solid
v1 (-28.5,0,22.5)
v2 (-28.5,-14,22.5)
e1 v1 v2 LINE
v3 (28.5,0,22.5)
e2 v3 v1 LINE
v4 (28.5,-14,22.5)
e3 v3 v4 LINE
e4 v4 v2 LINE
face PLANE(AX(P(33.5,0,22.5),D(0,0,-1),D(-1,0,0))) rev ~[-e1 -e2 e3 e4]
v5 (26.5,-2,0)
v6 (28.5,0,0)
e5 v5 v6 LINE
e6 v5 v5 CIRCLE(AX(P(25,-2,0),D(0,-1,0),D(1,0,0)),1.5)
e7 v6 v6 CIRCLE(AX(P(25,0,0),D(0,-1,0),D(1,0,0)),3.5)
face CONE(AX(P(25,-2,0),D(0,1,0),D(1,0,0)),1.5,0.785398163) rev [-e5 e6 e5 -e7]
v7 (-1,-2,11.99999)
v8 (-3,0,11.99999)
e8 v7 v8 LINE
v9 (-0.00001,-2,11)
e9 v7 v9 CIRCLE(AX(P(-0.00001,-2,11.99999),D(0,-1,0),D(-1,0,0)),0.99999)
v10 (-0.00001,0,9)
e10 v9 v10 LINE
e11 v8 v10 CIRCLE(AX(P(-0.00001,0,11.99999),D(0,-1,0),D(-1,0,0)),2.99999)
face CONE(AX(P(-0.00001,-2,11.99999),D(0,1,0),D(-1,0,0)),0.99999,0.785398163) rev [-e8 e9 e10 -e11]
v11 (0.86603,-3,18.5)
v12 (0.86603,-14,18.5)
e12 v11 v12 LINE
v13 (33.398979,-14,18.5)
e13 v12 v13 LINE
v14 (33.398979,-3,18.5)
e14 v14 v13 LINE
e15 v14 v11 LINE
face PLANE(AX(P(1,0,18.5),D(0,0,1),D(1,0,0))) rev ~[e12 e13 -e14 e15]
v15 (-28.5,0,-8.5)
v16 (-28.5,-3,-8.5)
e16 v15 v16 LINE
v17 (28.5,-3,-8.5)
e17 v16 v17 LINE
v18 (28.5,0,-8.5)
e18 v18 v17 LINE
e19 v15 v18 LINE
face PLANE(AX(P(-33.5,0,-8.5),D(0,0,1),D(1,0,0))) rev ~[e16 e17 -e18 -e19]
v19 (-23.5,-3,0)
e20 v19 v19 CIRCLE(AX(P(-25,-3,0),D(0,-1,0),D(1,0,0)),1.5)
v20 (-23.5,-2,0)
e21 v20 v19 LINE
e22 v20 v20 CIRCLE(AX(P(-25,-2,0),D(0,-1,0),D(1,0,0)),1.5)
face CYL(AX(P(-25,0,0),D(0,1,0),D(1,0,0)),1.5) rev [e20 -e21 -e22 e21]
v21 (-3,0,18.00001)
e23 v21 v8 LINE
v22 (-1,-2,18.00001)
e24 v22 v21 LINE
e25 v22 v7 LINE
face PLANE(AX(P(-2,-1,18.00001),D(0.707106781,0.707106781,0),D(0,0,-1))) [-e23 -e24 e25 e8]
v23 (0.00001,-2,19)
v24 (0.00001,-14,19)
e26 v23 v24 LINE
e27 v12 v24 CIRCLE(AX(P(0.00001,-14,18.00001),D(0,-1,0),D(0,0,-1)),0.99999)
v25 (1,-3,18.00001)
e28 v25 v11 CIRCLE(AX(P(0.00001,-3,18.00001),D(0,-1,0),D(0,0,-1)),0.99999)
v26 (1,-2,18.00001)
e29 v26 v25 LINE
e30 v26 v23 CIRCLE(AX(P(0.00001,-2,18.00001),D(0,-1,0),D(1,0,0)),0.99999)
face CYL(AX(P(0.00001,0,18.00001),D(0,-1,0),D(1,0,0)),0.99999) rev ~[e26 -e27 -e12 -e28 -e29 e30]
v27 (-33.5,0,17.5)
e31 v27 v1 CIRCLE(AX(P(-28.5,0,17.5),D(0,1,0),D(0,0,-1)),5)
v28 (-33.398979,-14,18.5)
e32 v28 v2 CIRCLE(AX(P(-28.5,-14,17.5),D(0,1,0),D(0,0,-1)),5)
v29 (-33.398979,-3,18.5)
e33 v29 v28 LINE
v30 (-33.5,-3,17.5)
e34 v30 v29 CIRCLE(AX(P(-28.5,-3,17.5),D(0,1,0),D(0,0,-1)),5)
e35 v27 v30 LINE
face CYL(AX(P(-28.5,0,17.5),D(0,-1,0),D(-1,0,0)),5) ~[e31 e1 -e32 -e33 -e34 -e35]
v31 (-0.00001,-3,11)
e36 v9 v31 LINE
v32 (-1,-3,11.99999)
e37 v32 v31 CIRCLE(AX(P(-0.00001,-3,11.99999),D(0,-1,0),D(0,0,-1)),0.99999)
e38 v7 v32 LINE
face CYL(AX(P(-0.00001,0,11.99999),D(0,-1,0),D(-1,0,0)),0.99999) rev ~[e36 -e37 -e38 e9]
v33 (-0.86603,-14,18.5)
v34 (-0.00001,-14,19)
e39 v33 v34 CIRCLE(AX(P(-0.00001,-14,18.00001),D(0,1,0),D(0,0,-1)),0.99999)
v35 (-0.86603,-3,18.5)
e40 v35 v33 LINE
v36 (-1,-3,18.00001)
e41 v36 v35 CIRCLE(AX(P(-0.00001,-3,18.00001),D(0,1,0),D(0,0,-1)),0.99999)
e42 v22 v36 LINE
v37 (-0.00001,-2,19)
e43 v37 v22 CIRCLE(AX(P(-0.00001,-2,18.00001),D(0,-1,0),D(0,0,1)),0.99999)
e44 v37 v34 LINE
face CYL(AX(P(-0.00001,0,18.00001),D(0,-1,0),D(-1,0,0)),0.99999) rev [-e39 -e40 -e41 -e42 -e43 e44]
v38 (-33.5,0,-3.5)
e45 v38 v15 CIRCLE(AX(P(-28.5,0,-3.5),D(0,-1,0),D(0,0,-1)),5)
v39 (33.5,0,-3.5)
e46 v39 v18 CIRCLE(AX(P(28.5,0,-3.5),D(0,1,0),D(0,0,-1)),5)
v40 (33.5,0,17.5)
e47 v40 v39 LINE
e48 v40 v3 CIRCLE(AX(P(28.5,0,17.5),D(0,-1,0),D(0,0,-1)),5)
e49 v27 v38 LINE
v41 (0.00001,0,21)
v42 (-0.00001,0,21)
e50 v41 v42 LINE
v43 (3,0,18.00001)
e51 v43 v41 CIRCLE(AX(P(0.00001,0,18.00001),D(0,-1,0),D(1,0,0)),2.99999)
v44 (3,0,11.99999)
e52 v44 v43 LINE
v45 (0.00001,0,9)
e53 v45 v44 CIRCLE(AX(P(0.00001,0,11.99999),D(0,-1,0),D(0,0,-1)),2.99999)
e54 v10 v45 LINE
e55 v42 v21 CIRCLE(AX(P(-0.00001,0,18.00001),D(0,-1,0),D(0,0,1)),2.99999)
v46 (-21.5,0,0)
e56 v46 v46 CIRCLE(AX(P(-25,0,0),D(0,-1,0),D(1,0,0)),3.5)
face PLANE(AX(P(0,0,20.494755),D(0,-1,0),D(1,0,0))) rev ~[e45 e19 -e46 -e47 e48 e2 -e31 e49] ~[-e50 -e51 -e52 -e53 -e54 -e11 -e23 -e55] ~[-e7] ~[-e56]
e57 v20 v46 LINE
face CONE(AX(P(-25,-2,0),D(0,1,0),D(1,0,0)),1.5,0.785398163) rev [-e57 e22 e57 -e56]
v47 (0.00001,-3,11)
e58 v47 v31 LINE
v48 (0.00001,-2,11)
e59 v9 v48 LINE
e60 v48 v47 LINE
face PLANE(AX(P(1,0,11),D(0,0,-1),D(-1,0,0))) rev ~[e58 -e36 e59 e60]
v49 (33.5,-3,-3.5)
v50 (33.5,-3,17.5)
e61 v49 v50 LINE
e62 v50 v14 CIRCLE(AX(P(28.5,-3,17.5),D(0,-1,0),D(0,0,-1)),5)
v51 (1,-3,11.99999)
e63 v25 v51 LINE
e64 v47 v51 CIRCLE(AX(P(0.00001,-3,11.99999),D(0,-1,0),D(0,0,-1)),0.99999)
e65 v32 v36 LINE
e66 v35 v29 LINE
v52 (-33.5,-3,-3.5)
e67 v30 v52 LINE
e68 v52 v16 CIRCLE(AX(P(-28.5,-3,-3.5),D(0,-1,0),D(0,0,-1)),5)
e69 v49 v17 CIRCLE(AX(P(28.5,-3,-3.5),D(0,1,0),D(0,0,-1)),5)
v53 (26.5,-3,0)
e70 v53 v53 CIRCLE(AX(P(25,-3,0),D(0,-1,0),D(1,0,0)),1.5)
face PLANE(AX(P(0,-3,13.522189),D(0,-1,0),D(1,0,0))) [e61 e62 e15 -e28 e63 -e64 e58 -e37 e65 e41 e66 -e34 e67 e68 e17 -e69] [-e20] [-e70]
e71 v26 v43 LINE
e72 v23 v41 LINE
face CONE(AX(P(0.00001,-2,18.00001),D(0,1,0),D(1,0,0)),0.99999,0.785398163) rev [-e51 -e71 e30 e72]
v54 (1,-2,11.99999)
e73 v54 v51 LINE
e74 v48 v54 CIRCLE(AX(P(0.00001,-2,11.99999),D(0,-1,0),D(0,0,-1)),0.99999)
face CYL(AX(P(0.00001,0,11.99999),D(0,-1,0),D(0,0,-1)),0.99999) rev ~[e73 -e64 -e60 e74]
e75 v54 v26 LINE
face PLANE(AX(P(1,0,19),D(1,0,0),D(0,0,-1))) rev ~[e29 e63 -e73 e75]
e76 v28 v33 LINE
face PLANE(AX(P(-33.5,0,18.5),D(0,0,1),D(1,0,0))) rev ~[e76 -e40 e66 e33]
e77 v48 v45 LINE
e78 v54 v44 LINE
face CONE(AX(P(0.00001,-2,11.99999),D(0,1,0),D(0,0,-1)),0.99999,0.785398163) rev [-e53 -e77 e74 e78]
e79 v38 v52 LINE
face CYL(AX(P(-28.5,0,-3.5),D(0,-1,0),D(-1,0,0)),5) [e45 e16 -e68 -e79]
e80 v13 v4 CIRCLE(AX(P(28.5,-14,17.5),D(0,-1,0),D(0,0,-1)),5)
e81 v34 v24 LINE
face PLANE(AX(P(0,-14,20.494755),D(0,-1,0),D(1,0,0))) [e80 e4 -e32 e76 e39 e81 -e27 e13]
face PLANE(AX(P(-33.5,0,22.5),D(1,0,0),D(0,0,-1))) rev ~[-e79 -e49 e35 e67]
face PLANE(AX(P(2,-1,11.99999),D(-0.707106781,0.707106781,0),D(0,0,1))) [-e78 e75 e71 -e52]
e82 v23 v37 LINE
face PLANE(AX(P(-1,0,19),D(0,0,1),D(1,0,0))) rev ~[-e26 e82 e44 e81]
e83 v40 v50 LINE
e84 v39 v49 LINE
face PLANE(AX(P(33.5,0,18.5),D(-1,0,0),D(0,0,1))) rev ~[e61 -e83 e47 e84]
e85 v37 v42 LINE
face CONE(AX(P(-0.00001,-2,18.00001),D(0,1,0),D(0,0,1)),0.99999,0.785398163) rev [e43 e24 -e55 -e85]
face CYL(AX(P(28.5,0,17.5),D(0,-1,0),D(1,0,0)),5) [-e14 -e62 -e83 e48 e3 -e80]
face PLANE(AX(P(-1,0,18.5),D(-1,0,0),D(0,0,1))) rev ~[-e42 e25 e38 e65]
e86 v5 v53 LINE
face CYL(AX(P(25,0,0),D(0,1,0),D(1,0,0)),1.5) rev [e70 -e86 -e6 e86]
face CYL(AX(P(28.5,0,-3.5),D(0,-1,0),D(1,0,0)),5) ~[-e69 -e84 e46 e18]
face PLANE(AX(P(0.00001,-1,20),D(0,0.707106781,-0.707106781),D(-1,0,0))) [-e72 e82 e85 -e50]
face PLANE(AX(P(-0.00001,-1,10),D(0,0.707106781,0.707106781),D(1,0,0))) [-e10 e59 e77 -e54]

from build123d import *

# Parameters (mm, degrees)
F0_W     = 67
F0_H     = 17
F0_R     = 1.5
F1_DEPTH = 3
F2_DEPTH = 14
F3_R     = 5
F4_R     = 0.99999
F5_SIZE  = 2


# Not quite as in the source:
# - a fillet or chamfer is up to 0.001 mm smaller than in the source, because OpenCascade refuses the exact size


with BuildPart() as f1:
    # F0 (on Front) → F1 (new body)
    with BuildSketch(Plane.XZ):
        Polygon((-33.5, 18.5), (-33.5, 8.5), (33.5, 8.5), (33.5, 18.5), (1, 18.5), (1, 11), (-1, 11), (-1, 18.5), align=None)
        Rectangle(F0_W, F0_H)
        with Locations((-25, 0)):
            Circle(F0_R, mode=Mode.SUBTRACT)
        with Locations((25, 0)):
            Circle(F0_R, mode=Mode.SUBTRACT)
    extrude(amount=F1_DEPTH)

    # F0 (on Front) → F2 (join)
    with BuildSketch(Plane.XZ):
        Polygon((-33.5, 22.5), (-33.5, 18.5), (-1, 18.5), (-1, 19), (1, 19), (1, 18.5), (33.5, 18.5), (33.5, 22.5), align=None)
    extrude(amount=F2_DEPTH)

    # F3
    f3_edges = [f1.edges().sort_by_distance(p)[0] for p in [
        (-33.5, -1.5, -8.5),
        (33.5, -1.5, -8.5),
        (-33.5, -7, 22.5),
        (33.5, -7, 22.5),
    ]]
    fillet(f3_edges, radius=F3_R)

    # F4 (radius 1 in the source; OpenCascade refuses exactly that, so slightly less here)
    f4_edges = [f1.edges().sort_by_distance(p)[0] for p in [
        (-1, -7, 19),
        (1, -7, 19),
        (1, -1.5, 11),
        (-1, -1.5, 11),
    ]]
    fillet(f4_edges, radius=F4_R)

    # F5
    f5_edges = [f1.edges().sort_by_distance(p)[0] for p in [
        (-26.5, 0, 0),
        (23.5, 0, 0),
        (-1, 0, 15),
    ]]
    chamfer(f5_edges, length=F5_SIZE)


solid = f1.part
